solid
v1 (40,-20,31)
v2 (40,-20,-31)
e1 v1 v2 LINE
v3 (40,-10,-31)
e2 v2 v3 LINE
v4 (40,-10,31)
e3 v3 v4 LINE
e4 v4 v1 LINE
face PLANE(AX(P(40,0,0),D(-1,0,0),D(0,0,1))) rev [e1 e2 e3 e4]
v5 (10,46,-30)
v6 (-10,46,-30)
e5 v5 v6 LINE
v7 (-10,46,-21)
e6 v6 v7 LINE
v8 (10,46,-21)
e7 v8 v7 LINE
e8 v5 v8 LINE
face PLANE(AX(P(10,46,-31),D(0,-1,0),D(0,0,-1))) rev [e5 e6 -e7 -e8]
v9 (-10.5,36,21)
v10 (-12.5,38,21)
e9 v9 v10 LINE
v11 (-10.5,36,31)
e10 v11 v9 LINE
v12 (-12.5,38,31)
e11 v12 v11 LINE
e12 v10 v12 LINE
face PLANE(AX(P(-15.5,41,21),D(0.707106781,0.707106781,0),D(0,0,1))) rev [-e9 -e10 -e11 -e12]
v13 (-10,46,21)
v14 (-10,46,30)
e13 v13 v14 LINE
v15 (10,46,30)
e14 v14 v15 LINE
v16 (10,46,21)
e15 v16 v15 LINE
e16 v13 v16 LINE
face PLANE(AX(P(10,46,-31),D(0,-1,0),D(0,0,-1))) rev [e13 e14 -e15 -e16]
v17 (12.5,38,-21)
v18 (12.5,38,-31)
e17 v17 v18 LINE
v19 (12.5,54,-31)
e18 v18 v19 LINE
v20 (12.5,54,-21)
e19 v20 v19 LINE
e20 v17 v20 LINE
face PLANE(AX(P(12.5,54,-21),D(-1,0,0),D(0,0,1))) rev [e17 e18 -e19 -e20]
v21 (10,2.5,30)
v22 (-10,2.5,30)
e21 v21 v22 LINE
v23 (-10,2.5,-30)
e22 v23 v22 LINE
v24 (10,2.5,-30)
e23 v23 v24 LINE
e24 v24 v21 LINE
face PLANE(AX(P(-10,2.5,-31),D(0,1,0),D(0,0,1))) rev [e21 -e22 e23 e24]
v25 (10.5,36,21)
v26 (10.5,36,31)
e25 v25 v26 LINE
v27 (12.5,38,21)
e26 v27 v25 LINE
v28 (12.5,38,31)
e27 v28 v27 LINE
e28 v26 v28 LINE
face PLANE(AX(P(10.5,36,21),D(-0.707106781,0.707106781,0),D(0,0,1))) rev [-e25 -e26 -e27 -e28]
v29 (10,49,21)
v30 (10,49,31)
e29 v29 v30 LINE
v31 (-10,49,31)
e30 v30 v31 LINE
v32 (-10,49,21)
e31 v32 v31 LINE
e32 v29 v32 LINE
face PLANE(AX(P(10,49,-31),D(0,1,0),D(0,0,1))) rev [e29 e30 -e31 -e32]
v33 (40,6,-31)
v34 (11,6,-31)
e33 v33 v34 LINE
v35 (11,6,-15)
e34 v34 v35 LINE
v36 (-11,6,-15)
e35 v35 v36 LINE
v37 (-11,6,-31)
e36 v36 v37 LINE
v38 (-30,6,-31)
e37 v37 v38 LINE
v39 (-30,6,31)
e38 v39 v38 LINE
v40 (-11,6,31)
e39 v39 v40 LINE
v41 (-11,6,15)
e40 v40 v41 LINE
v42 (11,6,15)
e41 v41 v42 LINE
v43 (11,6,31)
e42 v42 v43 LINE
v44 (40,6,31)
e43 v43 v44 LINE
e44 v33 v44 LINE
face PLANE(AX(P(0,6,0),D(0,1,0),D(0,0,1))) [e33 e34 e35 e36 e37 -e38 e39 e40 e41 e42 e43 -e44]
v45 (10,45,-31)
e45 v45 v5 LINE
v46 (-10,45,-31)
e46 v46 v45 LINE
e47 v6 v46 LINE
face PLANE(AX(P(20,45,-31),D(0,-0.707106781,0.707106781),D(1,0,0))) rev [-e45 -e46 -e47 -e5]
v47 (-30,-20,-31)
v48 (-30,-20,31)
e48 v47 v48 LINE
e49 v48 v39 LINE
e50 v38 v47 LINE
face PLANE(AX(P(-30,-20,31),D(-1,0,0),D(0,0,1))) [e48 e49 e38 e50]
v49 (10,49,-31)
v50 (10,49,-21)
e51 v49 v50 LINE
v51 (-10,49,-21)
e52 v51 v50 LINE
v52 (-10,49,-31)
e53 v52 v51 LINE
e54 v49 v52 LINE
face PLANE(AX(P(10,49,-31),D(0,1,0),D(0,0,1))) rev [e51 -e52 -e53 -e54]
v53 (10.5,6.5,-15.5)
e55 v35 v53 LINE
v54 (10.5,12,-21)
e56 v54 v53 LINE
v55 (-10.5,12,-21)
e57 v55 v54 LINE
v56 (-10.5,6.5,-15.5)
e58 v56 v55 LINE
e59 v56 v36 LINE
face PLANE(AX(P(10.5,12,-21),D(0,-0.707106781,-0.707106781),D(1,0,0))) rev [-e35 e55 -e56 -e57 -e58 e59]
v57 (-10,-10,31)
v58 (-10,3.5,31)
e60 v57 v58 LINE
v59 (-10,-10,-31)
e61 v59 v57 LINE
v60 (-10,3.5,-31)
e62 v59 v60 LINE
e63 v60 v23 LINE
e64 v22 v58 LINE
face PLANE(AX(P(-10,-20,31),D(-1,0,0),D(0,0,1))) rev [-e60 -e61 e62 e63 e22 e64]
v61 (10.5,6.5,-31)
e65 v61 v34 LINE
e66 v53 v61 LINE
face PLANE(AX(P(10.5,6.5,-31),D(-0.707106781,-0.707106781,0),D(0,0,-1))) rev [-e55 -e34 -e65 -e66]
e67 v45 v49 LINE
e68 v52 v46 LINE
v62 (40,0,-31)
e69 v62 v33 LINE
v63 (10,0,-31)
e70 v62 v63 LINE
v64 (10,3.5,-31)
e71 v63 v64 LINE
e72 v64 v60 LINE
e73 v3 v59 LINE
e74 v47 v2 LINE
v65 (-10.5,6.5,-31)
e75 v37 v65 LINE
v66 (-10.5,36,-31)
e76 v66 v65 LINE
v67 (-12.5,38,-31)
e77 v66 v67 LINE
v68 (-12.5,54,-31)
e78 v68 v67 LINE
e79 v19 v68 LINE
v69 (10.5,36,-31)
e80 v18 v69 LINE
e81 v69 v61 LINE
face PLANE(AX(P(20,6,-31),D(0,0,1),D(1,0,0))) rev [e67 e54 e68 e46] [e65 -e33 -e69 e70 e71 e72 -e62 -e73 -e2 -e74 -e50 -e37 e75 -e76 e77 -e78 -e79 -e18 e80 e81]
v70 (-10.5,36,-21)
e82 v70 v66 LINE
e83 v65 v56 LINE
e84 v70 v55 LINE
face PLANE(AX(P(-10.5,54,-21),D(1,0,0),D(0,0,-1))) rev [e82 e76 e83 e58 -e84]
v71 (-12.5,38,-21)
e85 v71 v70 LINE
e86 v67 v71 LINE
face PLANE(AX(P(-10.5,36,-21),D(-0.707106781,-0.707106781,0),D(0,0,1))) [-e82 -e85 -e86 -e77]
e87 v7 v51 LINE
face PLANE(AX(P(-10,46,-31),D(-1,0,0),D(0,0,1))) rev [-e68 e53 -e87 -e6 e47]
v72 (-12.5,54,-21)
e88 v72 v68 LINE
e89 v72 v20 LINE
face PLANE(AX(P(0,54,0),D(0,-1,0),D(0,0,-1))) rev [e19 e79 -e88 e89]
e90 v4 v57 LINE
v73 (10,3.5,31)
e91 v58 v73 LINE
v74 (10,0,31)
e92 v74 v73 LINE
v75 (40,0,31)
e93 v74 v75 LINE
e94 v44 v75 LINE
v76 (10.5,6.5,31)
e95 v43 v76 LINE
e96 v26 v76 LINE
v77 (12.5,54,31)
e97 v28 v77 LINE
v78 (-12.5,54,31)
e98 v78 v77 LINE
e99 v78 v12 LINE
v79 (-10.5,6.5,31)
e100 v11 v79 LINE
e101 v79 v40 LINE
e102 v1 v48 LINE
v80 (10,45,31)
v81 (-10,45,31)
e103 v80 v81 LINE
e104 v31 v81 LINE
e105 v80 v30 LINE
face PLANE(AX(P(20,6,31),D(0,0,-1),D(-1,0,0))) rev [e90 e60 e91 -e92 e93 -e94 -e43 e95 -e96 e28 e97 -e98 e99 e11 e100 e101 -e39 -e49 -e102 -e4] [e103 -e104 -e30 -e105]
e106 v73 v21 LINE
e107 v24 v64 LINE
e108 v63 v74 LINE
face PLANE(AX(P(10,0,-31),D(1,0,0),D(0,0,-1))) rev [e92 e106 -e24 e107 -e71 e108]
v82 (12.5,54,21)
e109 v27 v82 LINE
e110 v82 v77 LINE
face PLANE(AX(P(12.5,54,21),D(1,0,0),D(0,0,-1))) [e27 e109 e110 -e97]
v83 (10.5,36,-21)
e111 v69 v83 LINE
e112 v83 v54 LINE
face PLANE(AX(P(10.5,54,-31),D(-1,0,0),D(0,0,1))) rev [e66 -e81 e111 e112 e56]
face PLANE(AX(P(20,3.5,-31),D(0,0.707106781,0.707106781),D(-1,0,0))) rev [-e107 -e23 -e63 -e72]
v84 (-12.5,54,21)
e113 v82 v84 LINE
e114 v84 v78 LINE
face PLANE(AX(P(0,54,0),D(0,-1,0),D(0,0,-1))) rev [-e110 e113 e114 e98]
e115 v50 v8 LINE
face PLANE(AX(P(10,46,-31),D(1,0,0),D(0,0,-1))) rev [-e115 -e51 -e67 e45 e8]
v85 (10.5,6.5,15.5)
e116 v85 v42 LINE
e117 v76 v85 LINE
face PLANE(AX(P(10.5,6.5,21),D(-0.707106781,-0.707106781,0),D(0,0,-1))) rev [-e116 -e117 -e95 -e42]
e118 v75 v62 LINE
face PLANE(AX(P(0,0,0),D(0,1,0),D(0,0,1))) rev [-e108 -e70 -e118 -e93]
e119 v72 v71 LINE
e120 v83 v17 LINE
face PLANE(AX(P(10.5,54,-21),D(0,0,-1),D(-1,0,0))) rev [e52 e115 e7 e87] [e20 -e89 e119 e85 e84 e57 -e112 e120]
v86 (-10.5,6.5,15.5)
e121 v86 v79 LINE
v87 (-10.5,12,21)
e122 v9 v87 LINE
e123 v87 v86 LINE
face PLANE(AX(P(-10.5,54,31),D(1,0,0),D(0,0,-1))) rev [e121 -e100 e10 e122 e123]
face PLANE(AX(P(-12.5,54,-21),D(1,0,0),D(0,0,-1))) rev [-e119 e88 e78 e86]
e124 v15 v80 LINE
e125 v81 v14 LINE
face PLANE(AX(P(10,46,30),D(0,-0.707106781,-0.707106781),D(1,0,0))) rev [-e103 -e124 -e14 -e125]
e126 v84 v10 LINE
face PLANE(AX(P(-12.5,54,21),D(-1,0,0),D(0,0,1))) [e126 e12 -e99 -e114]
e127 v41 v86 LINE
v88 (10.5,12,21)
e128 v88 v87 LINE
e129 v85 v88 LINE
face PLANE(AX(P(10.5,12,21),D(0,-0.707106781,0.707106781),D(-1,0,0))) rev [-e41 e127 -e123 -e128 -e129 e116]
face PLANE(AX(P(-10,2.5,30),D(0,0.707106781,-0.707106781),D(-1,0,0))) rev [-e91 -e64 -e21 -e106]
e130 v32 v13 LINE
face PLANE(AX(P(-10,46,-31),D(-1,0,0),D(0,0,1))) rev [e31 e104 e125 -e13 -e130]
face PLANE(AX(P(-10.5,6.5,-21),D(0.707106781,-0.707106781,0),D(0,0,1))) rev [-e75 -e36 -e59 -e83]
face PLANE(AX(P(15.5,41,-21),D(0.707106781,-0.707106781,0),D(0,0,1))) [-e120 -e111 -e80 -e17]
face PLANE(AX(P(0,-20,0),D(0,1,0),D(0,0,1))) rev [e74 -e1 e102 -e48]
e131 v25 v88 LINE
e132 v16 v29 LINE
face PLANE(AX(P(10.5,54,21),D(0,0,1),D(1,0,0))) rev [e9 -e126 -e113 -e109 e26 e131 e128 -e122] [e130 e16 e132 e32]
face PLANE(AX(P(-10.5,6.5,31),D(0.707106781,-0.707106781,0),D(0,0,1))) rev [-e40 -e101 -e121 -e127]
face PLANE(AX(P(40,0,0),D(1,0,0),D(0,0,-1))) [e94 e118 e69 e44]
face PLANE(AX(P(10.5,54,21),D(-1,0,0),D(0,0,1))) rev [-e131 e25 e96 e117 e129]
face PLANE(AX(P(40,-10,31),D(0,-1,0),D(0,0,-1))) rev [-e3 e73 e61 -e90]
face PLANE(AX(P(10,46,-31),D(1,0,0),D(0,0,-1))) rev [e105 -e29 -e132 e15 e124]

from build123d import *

# Parameters (mm, degrees)
ESBO_O1_W                = 40
ESBO_O1_H                = 62
RESSALTO_EXTRUS_O1_DEPTH = 6
ESBO_O2_W                = 21
ESBO_O2_H                = 10
RESSALTO_EXTRUS_O2_DEPTH = 48
CHANFRO1_SIZE            = 6
ESBO_O3_W                = 10
ESBO_O3_H                = 62
RESSALTO_EXTRUS_O3_DEPTH = 20
ESBO_O4_W                = 62
ESBO_O4_H                = 10
RESSALTO_EXTRUS_O4_DEPTH = 50
ESBO_O5_W                = 2
ESBO_O5_H                = 13
RESSALTO_EXTRUS_O5_DEPTH = 10
ESBO_O6_W                = 20
ESBO_O6_H                = 3
ESBO_O6_H_2              = 2.5
CORTE_EXTRUS_O1_DEPTH    = 92.433035605
CHANFRO2_SIZE            = 1
CHANFRO3_SIZE            = 5
ESBO_O7_W                = 62
ESBO_O7_H                = 26
RESSALTO_EXTRUS_O6_DEPTH = 10
CHANFRO4_SIZE            = 0.5
ESBO_O8_W                = 62
ESBO_O8_H                = 6
RESSALTO_EXTRUS_O7_DEPTH = 20


with BuildPart() as part:
    # Esboço1 → Ressalto-extrusão1 (new body)
    with BuildSketch(Plane(origin=(0, 0, 0), x_dir=(1, 0, 0), z_dir=(0, 1, 0))):
        Rectangle(ESBO_O1_W, ESBO_O1_H)
    extrude(amount=RESSALTO_EXTRUS_O1_DEPTH)

    # Esboço2 → Ressalto-extrusão2 (add)
    with BuildSketch(Plane(origin=(0, 6, 0), x_dir=(1, 0, 0), z_dir=(0, 1, 0))):
        with Locations((0, -26)):
            Rectangle(ESBO_O2_W, ESBO_O2_H)
        with Locations((0, 26)):
            Rectangle(ESBO_O2_W, ESBO_O2_H)
    extrude(amount=RESSALTO_EXTRUS_O2_DEPTH)

    # Chanfro1
    chanfro1_edges = [part.edges().sort_by_distance(p)[0] for p in [
        (0, 6, -21),
        (0, 6, 21),
    ]]
    chamfer(chanfro1_edges, length=CHANFRO1_SIZE)

    # Esboço3 → Ressalto-extrusão3 (add)
    with BuildSketch(Plane.XZ):
        with Locations((-15, 0)):
            Rectangle(ESBO_O3_W, ESBO_O3_H)
    extrude(amount=RESSALTO_EXTRUS_O3_DEPTH)

    # Esboço4 → Ressalto-extrusão4 (add)
    with BuildSketch(Plane(origin=(-10, 0, 0), x_dir=(0, 0, -1), z_dir=(1, 0, 0))):
        with Locations((0, -15)):
            Rectangle(ESBO_O4_W, ESBO_O4_H)
    extrude(amount=RESSALTO_EXTRUS_O4_DEPTH)

    # Esboço5 → Ressalto-extrusão5 (add)
    with BuildSketch(Plane.XY.offset(31)):
        with Locations((-11.5, 47.5)):
            Rectangle(ESBO_O5_W, ESBO_O5_H)
        with Locations((11.5, 47.5)):
            Rectangle(ESBO_O5_W, ESBO_O5_H)
    ressalto_extrus_o5 = extrude(amount=-RESSALTO_EXTRUS_O5_DEPTH)

    # Espelhar1: Ressalto-extrusão5 across plane
    add(ressalto_extrus_o5.mirror(Plane.XY))

    # Esboço6 → Corte-extrusão1 (cut, through all)
    with BuildSketch(Plane.XY.offset(31)):
        with Locations((0, 47.5)):
            Rectangle(ESBO_O6_W, ESBO_O6_H)
        with Locations((0, 1.25)):
            Rectangle(ESBO_O6_W, ESBO_O6_H_2)
    extrude(amount=-CORTE_EXTRUS_O1_DEPTH, mode=Mode.SUBTRACT)

    # Chanfro2
    chanfro2_edges = [part.edges().sort_by_distance(p)[0] for p in [
        (0, 46, -31),
        (0, 46, 31),
        (0, 2.5, -31),
        (0, 2.5, 31),
    ]]
    chamfer(chanfro2_edges, length=CHANFRO2_SIZE)

    # Chanfro3
    # the kernel refuses this chamfer: 5 mm, written as the material it adds along each edge
    with BuildSketch(Plane(origin=(-10.5, 41, -31), x_dir=(-0.9996219169112968, 0.027495876610586317, 0), z_dir=(0, 0, 1))) as chanfro3_piece_1_section:
        Polygon((CHANFRO3_SIZE * 0.999621916911, CHANFRO3_SIZE * 0.0274958766106), (-CHANFRO3_SIZE * 0.0274958766106, CHANFRO3_SIZE * 0.999621916911), (0, 0), align=None)
    chanfro3_piece_1 = extrude(amount=10, mode=Mode.PRIVATE)
    chanfro3_piece_1 = split(chanfro3_piece_1, bisect_by=Plane(origin=(-12.5, 38.93054755, -26), z_dir=(1, 0, 0)), keep=Keep.TOP, mode=Mode.PRIVATE)
    add(chanfro3_piece_1)
    with BuildSketch(Plane(origin=(10.5, 41, -31), x_dir=(-0.02749587661058701, -0.9996219169112968, 0), z_dir=(0, 0, 1))) as chanfro3_piece_2_section:
        Polygon((CHANFRO3_SIZE * 0.999621916911, CHANFRO3_SIZE * 0.0274958766106), (-CHANFRO3_SIZE * 0.0274958766106, CHANFRO3_SIZE * 0.999621916911), (0, 0), align=None)
    chanfro3_piece_2 = extrude(amount=10, mode=Mode.PRIVATE)
    chanfro3_piece_2 = split(chanfro3_piece_2, bisect_by=Plane(origin=(12.5, 38.93054755, -26), z_dir=(-1, 0, 0)), keep=Keep.TOP, mode=Mode.PRIVATE)
    add(chanfro3_piece_2)
    with BuildSketch(Plane(origin=(10.5, 41, 31), x_dir=(0.9996219169112968, 0.027495876610586317, 0), z_dir=(0, 0, -1))) as chanfro3_piece_3_section:
        Polygon((CHANFRO3_SIZE * 0.999621916911, CHANFRO3_SIZE * 0.0274958766106), (-CHANFRO3_SIZE * 0.0274958766106, CHANFRO3_SIZE * 0.999621916911), (0, 0), align=None)
    chanfro3_piece_3 = extrude(amount=10, mode=Mode.PRIVATE)
    chanfro3_piece_3 = split(chanfro3_piece_3, bisect_by=Plane(origin=(12.5, 38.93054755, 26), z_dir=(-1, 0, 0)), keep=Keep.TOP, mode=Mode.PRIVATE)
    add(chanfro3_piece_3)
    with BuildSketch(Plane(origin=(-10.5, 41, 31), x_dir=(0.027495876610584936, -0.9996219169112968, 0), z_dir=(0, 0, -1))) as chanfro3_piece_4_section:
        Polygon((CHANFRO3_SIZE * 0.999621916911, CHANFRO3_SIZE * 0.0274958766106), (-CHANFRO3_SIZE * 0.0274958766106, CHANFRO3_SIZE * 0.999621916911), (0, 0), align=None)
    chanfro3_piece_4 = extrude(amount=10, mode=Mode.PRIVATE)
    chanfro3_piece_4 = split(chanfro3_piece_4, bisect_by=Plane(origin=(-12.5, 38.93054755, 26), z_dir=(1, 0, 0)), keep=Keep.TOP, mode=Mode.PRIVATE)
    add(chanfro3_piece_4)

    # Esboço7 → Ressalto-extrusão6 (add)
    with BuildSketch(Plane.ZY.offset(20)):
        with Locations((0, -7)):
            Rectangle(ESBO_O7_W, ESBO_O7_H)
    extrude(amount=RESSALTO_EXTRUS_O6_DEPTH)

    # Chanfro4
    chanfro4_edges = [part.edges().sort_by_distance(p)[0] for p in [
        (-10.5, 6, -23),
        (10.5, 6, -23),
        (10.5, 6, 23),
        (-10.5, 6, 23),
    ]]
    chamfer(chanfro4_edges, length=CHANFRO4_SIZE)

    # Esboço8 → Ressalto-extrusão7 (add)
    with BuildSketch(Plane(origin=(20, 0, 0), x_dir=(0, 0, -1), z_dir=(1, 0, 0))):
        with Locations((0, 3)):
            Rectangle(ESBO_O8_W, ESBO_O8_H)
    extrude(amount=RESSALTO_EXTRUS_O7_DEPTH)


solid = part.part
